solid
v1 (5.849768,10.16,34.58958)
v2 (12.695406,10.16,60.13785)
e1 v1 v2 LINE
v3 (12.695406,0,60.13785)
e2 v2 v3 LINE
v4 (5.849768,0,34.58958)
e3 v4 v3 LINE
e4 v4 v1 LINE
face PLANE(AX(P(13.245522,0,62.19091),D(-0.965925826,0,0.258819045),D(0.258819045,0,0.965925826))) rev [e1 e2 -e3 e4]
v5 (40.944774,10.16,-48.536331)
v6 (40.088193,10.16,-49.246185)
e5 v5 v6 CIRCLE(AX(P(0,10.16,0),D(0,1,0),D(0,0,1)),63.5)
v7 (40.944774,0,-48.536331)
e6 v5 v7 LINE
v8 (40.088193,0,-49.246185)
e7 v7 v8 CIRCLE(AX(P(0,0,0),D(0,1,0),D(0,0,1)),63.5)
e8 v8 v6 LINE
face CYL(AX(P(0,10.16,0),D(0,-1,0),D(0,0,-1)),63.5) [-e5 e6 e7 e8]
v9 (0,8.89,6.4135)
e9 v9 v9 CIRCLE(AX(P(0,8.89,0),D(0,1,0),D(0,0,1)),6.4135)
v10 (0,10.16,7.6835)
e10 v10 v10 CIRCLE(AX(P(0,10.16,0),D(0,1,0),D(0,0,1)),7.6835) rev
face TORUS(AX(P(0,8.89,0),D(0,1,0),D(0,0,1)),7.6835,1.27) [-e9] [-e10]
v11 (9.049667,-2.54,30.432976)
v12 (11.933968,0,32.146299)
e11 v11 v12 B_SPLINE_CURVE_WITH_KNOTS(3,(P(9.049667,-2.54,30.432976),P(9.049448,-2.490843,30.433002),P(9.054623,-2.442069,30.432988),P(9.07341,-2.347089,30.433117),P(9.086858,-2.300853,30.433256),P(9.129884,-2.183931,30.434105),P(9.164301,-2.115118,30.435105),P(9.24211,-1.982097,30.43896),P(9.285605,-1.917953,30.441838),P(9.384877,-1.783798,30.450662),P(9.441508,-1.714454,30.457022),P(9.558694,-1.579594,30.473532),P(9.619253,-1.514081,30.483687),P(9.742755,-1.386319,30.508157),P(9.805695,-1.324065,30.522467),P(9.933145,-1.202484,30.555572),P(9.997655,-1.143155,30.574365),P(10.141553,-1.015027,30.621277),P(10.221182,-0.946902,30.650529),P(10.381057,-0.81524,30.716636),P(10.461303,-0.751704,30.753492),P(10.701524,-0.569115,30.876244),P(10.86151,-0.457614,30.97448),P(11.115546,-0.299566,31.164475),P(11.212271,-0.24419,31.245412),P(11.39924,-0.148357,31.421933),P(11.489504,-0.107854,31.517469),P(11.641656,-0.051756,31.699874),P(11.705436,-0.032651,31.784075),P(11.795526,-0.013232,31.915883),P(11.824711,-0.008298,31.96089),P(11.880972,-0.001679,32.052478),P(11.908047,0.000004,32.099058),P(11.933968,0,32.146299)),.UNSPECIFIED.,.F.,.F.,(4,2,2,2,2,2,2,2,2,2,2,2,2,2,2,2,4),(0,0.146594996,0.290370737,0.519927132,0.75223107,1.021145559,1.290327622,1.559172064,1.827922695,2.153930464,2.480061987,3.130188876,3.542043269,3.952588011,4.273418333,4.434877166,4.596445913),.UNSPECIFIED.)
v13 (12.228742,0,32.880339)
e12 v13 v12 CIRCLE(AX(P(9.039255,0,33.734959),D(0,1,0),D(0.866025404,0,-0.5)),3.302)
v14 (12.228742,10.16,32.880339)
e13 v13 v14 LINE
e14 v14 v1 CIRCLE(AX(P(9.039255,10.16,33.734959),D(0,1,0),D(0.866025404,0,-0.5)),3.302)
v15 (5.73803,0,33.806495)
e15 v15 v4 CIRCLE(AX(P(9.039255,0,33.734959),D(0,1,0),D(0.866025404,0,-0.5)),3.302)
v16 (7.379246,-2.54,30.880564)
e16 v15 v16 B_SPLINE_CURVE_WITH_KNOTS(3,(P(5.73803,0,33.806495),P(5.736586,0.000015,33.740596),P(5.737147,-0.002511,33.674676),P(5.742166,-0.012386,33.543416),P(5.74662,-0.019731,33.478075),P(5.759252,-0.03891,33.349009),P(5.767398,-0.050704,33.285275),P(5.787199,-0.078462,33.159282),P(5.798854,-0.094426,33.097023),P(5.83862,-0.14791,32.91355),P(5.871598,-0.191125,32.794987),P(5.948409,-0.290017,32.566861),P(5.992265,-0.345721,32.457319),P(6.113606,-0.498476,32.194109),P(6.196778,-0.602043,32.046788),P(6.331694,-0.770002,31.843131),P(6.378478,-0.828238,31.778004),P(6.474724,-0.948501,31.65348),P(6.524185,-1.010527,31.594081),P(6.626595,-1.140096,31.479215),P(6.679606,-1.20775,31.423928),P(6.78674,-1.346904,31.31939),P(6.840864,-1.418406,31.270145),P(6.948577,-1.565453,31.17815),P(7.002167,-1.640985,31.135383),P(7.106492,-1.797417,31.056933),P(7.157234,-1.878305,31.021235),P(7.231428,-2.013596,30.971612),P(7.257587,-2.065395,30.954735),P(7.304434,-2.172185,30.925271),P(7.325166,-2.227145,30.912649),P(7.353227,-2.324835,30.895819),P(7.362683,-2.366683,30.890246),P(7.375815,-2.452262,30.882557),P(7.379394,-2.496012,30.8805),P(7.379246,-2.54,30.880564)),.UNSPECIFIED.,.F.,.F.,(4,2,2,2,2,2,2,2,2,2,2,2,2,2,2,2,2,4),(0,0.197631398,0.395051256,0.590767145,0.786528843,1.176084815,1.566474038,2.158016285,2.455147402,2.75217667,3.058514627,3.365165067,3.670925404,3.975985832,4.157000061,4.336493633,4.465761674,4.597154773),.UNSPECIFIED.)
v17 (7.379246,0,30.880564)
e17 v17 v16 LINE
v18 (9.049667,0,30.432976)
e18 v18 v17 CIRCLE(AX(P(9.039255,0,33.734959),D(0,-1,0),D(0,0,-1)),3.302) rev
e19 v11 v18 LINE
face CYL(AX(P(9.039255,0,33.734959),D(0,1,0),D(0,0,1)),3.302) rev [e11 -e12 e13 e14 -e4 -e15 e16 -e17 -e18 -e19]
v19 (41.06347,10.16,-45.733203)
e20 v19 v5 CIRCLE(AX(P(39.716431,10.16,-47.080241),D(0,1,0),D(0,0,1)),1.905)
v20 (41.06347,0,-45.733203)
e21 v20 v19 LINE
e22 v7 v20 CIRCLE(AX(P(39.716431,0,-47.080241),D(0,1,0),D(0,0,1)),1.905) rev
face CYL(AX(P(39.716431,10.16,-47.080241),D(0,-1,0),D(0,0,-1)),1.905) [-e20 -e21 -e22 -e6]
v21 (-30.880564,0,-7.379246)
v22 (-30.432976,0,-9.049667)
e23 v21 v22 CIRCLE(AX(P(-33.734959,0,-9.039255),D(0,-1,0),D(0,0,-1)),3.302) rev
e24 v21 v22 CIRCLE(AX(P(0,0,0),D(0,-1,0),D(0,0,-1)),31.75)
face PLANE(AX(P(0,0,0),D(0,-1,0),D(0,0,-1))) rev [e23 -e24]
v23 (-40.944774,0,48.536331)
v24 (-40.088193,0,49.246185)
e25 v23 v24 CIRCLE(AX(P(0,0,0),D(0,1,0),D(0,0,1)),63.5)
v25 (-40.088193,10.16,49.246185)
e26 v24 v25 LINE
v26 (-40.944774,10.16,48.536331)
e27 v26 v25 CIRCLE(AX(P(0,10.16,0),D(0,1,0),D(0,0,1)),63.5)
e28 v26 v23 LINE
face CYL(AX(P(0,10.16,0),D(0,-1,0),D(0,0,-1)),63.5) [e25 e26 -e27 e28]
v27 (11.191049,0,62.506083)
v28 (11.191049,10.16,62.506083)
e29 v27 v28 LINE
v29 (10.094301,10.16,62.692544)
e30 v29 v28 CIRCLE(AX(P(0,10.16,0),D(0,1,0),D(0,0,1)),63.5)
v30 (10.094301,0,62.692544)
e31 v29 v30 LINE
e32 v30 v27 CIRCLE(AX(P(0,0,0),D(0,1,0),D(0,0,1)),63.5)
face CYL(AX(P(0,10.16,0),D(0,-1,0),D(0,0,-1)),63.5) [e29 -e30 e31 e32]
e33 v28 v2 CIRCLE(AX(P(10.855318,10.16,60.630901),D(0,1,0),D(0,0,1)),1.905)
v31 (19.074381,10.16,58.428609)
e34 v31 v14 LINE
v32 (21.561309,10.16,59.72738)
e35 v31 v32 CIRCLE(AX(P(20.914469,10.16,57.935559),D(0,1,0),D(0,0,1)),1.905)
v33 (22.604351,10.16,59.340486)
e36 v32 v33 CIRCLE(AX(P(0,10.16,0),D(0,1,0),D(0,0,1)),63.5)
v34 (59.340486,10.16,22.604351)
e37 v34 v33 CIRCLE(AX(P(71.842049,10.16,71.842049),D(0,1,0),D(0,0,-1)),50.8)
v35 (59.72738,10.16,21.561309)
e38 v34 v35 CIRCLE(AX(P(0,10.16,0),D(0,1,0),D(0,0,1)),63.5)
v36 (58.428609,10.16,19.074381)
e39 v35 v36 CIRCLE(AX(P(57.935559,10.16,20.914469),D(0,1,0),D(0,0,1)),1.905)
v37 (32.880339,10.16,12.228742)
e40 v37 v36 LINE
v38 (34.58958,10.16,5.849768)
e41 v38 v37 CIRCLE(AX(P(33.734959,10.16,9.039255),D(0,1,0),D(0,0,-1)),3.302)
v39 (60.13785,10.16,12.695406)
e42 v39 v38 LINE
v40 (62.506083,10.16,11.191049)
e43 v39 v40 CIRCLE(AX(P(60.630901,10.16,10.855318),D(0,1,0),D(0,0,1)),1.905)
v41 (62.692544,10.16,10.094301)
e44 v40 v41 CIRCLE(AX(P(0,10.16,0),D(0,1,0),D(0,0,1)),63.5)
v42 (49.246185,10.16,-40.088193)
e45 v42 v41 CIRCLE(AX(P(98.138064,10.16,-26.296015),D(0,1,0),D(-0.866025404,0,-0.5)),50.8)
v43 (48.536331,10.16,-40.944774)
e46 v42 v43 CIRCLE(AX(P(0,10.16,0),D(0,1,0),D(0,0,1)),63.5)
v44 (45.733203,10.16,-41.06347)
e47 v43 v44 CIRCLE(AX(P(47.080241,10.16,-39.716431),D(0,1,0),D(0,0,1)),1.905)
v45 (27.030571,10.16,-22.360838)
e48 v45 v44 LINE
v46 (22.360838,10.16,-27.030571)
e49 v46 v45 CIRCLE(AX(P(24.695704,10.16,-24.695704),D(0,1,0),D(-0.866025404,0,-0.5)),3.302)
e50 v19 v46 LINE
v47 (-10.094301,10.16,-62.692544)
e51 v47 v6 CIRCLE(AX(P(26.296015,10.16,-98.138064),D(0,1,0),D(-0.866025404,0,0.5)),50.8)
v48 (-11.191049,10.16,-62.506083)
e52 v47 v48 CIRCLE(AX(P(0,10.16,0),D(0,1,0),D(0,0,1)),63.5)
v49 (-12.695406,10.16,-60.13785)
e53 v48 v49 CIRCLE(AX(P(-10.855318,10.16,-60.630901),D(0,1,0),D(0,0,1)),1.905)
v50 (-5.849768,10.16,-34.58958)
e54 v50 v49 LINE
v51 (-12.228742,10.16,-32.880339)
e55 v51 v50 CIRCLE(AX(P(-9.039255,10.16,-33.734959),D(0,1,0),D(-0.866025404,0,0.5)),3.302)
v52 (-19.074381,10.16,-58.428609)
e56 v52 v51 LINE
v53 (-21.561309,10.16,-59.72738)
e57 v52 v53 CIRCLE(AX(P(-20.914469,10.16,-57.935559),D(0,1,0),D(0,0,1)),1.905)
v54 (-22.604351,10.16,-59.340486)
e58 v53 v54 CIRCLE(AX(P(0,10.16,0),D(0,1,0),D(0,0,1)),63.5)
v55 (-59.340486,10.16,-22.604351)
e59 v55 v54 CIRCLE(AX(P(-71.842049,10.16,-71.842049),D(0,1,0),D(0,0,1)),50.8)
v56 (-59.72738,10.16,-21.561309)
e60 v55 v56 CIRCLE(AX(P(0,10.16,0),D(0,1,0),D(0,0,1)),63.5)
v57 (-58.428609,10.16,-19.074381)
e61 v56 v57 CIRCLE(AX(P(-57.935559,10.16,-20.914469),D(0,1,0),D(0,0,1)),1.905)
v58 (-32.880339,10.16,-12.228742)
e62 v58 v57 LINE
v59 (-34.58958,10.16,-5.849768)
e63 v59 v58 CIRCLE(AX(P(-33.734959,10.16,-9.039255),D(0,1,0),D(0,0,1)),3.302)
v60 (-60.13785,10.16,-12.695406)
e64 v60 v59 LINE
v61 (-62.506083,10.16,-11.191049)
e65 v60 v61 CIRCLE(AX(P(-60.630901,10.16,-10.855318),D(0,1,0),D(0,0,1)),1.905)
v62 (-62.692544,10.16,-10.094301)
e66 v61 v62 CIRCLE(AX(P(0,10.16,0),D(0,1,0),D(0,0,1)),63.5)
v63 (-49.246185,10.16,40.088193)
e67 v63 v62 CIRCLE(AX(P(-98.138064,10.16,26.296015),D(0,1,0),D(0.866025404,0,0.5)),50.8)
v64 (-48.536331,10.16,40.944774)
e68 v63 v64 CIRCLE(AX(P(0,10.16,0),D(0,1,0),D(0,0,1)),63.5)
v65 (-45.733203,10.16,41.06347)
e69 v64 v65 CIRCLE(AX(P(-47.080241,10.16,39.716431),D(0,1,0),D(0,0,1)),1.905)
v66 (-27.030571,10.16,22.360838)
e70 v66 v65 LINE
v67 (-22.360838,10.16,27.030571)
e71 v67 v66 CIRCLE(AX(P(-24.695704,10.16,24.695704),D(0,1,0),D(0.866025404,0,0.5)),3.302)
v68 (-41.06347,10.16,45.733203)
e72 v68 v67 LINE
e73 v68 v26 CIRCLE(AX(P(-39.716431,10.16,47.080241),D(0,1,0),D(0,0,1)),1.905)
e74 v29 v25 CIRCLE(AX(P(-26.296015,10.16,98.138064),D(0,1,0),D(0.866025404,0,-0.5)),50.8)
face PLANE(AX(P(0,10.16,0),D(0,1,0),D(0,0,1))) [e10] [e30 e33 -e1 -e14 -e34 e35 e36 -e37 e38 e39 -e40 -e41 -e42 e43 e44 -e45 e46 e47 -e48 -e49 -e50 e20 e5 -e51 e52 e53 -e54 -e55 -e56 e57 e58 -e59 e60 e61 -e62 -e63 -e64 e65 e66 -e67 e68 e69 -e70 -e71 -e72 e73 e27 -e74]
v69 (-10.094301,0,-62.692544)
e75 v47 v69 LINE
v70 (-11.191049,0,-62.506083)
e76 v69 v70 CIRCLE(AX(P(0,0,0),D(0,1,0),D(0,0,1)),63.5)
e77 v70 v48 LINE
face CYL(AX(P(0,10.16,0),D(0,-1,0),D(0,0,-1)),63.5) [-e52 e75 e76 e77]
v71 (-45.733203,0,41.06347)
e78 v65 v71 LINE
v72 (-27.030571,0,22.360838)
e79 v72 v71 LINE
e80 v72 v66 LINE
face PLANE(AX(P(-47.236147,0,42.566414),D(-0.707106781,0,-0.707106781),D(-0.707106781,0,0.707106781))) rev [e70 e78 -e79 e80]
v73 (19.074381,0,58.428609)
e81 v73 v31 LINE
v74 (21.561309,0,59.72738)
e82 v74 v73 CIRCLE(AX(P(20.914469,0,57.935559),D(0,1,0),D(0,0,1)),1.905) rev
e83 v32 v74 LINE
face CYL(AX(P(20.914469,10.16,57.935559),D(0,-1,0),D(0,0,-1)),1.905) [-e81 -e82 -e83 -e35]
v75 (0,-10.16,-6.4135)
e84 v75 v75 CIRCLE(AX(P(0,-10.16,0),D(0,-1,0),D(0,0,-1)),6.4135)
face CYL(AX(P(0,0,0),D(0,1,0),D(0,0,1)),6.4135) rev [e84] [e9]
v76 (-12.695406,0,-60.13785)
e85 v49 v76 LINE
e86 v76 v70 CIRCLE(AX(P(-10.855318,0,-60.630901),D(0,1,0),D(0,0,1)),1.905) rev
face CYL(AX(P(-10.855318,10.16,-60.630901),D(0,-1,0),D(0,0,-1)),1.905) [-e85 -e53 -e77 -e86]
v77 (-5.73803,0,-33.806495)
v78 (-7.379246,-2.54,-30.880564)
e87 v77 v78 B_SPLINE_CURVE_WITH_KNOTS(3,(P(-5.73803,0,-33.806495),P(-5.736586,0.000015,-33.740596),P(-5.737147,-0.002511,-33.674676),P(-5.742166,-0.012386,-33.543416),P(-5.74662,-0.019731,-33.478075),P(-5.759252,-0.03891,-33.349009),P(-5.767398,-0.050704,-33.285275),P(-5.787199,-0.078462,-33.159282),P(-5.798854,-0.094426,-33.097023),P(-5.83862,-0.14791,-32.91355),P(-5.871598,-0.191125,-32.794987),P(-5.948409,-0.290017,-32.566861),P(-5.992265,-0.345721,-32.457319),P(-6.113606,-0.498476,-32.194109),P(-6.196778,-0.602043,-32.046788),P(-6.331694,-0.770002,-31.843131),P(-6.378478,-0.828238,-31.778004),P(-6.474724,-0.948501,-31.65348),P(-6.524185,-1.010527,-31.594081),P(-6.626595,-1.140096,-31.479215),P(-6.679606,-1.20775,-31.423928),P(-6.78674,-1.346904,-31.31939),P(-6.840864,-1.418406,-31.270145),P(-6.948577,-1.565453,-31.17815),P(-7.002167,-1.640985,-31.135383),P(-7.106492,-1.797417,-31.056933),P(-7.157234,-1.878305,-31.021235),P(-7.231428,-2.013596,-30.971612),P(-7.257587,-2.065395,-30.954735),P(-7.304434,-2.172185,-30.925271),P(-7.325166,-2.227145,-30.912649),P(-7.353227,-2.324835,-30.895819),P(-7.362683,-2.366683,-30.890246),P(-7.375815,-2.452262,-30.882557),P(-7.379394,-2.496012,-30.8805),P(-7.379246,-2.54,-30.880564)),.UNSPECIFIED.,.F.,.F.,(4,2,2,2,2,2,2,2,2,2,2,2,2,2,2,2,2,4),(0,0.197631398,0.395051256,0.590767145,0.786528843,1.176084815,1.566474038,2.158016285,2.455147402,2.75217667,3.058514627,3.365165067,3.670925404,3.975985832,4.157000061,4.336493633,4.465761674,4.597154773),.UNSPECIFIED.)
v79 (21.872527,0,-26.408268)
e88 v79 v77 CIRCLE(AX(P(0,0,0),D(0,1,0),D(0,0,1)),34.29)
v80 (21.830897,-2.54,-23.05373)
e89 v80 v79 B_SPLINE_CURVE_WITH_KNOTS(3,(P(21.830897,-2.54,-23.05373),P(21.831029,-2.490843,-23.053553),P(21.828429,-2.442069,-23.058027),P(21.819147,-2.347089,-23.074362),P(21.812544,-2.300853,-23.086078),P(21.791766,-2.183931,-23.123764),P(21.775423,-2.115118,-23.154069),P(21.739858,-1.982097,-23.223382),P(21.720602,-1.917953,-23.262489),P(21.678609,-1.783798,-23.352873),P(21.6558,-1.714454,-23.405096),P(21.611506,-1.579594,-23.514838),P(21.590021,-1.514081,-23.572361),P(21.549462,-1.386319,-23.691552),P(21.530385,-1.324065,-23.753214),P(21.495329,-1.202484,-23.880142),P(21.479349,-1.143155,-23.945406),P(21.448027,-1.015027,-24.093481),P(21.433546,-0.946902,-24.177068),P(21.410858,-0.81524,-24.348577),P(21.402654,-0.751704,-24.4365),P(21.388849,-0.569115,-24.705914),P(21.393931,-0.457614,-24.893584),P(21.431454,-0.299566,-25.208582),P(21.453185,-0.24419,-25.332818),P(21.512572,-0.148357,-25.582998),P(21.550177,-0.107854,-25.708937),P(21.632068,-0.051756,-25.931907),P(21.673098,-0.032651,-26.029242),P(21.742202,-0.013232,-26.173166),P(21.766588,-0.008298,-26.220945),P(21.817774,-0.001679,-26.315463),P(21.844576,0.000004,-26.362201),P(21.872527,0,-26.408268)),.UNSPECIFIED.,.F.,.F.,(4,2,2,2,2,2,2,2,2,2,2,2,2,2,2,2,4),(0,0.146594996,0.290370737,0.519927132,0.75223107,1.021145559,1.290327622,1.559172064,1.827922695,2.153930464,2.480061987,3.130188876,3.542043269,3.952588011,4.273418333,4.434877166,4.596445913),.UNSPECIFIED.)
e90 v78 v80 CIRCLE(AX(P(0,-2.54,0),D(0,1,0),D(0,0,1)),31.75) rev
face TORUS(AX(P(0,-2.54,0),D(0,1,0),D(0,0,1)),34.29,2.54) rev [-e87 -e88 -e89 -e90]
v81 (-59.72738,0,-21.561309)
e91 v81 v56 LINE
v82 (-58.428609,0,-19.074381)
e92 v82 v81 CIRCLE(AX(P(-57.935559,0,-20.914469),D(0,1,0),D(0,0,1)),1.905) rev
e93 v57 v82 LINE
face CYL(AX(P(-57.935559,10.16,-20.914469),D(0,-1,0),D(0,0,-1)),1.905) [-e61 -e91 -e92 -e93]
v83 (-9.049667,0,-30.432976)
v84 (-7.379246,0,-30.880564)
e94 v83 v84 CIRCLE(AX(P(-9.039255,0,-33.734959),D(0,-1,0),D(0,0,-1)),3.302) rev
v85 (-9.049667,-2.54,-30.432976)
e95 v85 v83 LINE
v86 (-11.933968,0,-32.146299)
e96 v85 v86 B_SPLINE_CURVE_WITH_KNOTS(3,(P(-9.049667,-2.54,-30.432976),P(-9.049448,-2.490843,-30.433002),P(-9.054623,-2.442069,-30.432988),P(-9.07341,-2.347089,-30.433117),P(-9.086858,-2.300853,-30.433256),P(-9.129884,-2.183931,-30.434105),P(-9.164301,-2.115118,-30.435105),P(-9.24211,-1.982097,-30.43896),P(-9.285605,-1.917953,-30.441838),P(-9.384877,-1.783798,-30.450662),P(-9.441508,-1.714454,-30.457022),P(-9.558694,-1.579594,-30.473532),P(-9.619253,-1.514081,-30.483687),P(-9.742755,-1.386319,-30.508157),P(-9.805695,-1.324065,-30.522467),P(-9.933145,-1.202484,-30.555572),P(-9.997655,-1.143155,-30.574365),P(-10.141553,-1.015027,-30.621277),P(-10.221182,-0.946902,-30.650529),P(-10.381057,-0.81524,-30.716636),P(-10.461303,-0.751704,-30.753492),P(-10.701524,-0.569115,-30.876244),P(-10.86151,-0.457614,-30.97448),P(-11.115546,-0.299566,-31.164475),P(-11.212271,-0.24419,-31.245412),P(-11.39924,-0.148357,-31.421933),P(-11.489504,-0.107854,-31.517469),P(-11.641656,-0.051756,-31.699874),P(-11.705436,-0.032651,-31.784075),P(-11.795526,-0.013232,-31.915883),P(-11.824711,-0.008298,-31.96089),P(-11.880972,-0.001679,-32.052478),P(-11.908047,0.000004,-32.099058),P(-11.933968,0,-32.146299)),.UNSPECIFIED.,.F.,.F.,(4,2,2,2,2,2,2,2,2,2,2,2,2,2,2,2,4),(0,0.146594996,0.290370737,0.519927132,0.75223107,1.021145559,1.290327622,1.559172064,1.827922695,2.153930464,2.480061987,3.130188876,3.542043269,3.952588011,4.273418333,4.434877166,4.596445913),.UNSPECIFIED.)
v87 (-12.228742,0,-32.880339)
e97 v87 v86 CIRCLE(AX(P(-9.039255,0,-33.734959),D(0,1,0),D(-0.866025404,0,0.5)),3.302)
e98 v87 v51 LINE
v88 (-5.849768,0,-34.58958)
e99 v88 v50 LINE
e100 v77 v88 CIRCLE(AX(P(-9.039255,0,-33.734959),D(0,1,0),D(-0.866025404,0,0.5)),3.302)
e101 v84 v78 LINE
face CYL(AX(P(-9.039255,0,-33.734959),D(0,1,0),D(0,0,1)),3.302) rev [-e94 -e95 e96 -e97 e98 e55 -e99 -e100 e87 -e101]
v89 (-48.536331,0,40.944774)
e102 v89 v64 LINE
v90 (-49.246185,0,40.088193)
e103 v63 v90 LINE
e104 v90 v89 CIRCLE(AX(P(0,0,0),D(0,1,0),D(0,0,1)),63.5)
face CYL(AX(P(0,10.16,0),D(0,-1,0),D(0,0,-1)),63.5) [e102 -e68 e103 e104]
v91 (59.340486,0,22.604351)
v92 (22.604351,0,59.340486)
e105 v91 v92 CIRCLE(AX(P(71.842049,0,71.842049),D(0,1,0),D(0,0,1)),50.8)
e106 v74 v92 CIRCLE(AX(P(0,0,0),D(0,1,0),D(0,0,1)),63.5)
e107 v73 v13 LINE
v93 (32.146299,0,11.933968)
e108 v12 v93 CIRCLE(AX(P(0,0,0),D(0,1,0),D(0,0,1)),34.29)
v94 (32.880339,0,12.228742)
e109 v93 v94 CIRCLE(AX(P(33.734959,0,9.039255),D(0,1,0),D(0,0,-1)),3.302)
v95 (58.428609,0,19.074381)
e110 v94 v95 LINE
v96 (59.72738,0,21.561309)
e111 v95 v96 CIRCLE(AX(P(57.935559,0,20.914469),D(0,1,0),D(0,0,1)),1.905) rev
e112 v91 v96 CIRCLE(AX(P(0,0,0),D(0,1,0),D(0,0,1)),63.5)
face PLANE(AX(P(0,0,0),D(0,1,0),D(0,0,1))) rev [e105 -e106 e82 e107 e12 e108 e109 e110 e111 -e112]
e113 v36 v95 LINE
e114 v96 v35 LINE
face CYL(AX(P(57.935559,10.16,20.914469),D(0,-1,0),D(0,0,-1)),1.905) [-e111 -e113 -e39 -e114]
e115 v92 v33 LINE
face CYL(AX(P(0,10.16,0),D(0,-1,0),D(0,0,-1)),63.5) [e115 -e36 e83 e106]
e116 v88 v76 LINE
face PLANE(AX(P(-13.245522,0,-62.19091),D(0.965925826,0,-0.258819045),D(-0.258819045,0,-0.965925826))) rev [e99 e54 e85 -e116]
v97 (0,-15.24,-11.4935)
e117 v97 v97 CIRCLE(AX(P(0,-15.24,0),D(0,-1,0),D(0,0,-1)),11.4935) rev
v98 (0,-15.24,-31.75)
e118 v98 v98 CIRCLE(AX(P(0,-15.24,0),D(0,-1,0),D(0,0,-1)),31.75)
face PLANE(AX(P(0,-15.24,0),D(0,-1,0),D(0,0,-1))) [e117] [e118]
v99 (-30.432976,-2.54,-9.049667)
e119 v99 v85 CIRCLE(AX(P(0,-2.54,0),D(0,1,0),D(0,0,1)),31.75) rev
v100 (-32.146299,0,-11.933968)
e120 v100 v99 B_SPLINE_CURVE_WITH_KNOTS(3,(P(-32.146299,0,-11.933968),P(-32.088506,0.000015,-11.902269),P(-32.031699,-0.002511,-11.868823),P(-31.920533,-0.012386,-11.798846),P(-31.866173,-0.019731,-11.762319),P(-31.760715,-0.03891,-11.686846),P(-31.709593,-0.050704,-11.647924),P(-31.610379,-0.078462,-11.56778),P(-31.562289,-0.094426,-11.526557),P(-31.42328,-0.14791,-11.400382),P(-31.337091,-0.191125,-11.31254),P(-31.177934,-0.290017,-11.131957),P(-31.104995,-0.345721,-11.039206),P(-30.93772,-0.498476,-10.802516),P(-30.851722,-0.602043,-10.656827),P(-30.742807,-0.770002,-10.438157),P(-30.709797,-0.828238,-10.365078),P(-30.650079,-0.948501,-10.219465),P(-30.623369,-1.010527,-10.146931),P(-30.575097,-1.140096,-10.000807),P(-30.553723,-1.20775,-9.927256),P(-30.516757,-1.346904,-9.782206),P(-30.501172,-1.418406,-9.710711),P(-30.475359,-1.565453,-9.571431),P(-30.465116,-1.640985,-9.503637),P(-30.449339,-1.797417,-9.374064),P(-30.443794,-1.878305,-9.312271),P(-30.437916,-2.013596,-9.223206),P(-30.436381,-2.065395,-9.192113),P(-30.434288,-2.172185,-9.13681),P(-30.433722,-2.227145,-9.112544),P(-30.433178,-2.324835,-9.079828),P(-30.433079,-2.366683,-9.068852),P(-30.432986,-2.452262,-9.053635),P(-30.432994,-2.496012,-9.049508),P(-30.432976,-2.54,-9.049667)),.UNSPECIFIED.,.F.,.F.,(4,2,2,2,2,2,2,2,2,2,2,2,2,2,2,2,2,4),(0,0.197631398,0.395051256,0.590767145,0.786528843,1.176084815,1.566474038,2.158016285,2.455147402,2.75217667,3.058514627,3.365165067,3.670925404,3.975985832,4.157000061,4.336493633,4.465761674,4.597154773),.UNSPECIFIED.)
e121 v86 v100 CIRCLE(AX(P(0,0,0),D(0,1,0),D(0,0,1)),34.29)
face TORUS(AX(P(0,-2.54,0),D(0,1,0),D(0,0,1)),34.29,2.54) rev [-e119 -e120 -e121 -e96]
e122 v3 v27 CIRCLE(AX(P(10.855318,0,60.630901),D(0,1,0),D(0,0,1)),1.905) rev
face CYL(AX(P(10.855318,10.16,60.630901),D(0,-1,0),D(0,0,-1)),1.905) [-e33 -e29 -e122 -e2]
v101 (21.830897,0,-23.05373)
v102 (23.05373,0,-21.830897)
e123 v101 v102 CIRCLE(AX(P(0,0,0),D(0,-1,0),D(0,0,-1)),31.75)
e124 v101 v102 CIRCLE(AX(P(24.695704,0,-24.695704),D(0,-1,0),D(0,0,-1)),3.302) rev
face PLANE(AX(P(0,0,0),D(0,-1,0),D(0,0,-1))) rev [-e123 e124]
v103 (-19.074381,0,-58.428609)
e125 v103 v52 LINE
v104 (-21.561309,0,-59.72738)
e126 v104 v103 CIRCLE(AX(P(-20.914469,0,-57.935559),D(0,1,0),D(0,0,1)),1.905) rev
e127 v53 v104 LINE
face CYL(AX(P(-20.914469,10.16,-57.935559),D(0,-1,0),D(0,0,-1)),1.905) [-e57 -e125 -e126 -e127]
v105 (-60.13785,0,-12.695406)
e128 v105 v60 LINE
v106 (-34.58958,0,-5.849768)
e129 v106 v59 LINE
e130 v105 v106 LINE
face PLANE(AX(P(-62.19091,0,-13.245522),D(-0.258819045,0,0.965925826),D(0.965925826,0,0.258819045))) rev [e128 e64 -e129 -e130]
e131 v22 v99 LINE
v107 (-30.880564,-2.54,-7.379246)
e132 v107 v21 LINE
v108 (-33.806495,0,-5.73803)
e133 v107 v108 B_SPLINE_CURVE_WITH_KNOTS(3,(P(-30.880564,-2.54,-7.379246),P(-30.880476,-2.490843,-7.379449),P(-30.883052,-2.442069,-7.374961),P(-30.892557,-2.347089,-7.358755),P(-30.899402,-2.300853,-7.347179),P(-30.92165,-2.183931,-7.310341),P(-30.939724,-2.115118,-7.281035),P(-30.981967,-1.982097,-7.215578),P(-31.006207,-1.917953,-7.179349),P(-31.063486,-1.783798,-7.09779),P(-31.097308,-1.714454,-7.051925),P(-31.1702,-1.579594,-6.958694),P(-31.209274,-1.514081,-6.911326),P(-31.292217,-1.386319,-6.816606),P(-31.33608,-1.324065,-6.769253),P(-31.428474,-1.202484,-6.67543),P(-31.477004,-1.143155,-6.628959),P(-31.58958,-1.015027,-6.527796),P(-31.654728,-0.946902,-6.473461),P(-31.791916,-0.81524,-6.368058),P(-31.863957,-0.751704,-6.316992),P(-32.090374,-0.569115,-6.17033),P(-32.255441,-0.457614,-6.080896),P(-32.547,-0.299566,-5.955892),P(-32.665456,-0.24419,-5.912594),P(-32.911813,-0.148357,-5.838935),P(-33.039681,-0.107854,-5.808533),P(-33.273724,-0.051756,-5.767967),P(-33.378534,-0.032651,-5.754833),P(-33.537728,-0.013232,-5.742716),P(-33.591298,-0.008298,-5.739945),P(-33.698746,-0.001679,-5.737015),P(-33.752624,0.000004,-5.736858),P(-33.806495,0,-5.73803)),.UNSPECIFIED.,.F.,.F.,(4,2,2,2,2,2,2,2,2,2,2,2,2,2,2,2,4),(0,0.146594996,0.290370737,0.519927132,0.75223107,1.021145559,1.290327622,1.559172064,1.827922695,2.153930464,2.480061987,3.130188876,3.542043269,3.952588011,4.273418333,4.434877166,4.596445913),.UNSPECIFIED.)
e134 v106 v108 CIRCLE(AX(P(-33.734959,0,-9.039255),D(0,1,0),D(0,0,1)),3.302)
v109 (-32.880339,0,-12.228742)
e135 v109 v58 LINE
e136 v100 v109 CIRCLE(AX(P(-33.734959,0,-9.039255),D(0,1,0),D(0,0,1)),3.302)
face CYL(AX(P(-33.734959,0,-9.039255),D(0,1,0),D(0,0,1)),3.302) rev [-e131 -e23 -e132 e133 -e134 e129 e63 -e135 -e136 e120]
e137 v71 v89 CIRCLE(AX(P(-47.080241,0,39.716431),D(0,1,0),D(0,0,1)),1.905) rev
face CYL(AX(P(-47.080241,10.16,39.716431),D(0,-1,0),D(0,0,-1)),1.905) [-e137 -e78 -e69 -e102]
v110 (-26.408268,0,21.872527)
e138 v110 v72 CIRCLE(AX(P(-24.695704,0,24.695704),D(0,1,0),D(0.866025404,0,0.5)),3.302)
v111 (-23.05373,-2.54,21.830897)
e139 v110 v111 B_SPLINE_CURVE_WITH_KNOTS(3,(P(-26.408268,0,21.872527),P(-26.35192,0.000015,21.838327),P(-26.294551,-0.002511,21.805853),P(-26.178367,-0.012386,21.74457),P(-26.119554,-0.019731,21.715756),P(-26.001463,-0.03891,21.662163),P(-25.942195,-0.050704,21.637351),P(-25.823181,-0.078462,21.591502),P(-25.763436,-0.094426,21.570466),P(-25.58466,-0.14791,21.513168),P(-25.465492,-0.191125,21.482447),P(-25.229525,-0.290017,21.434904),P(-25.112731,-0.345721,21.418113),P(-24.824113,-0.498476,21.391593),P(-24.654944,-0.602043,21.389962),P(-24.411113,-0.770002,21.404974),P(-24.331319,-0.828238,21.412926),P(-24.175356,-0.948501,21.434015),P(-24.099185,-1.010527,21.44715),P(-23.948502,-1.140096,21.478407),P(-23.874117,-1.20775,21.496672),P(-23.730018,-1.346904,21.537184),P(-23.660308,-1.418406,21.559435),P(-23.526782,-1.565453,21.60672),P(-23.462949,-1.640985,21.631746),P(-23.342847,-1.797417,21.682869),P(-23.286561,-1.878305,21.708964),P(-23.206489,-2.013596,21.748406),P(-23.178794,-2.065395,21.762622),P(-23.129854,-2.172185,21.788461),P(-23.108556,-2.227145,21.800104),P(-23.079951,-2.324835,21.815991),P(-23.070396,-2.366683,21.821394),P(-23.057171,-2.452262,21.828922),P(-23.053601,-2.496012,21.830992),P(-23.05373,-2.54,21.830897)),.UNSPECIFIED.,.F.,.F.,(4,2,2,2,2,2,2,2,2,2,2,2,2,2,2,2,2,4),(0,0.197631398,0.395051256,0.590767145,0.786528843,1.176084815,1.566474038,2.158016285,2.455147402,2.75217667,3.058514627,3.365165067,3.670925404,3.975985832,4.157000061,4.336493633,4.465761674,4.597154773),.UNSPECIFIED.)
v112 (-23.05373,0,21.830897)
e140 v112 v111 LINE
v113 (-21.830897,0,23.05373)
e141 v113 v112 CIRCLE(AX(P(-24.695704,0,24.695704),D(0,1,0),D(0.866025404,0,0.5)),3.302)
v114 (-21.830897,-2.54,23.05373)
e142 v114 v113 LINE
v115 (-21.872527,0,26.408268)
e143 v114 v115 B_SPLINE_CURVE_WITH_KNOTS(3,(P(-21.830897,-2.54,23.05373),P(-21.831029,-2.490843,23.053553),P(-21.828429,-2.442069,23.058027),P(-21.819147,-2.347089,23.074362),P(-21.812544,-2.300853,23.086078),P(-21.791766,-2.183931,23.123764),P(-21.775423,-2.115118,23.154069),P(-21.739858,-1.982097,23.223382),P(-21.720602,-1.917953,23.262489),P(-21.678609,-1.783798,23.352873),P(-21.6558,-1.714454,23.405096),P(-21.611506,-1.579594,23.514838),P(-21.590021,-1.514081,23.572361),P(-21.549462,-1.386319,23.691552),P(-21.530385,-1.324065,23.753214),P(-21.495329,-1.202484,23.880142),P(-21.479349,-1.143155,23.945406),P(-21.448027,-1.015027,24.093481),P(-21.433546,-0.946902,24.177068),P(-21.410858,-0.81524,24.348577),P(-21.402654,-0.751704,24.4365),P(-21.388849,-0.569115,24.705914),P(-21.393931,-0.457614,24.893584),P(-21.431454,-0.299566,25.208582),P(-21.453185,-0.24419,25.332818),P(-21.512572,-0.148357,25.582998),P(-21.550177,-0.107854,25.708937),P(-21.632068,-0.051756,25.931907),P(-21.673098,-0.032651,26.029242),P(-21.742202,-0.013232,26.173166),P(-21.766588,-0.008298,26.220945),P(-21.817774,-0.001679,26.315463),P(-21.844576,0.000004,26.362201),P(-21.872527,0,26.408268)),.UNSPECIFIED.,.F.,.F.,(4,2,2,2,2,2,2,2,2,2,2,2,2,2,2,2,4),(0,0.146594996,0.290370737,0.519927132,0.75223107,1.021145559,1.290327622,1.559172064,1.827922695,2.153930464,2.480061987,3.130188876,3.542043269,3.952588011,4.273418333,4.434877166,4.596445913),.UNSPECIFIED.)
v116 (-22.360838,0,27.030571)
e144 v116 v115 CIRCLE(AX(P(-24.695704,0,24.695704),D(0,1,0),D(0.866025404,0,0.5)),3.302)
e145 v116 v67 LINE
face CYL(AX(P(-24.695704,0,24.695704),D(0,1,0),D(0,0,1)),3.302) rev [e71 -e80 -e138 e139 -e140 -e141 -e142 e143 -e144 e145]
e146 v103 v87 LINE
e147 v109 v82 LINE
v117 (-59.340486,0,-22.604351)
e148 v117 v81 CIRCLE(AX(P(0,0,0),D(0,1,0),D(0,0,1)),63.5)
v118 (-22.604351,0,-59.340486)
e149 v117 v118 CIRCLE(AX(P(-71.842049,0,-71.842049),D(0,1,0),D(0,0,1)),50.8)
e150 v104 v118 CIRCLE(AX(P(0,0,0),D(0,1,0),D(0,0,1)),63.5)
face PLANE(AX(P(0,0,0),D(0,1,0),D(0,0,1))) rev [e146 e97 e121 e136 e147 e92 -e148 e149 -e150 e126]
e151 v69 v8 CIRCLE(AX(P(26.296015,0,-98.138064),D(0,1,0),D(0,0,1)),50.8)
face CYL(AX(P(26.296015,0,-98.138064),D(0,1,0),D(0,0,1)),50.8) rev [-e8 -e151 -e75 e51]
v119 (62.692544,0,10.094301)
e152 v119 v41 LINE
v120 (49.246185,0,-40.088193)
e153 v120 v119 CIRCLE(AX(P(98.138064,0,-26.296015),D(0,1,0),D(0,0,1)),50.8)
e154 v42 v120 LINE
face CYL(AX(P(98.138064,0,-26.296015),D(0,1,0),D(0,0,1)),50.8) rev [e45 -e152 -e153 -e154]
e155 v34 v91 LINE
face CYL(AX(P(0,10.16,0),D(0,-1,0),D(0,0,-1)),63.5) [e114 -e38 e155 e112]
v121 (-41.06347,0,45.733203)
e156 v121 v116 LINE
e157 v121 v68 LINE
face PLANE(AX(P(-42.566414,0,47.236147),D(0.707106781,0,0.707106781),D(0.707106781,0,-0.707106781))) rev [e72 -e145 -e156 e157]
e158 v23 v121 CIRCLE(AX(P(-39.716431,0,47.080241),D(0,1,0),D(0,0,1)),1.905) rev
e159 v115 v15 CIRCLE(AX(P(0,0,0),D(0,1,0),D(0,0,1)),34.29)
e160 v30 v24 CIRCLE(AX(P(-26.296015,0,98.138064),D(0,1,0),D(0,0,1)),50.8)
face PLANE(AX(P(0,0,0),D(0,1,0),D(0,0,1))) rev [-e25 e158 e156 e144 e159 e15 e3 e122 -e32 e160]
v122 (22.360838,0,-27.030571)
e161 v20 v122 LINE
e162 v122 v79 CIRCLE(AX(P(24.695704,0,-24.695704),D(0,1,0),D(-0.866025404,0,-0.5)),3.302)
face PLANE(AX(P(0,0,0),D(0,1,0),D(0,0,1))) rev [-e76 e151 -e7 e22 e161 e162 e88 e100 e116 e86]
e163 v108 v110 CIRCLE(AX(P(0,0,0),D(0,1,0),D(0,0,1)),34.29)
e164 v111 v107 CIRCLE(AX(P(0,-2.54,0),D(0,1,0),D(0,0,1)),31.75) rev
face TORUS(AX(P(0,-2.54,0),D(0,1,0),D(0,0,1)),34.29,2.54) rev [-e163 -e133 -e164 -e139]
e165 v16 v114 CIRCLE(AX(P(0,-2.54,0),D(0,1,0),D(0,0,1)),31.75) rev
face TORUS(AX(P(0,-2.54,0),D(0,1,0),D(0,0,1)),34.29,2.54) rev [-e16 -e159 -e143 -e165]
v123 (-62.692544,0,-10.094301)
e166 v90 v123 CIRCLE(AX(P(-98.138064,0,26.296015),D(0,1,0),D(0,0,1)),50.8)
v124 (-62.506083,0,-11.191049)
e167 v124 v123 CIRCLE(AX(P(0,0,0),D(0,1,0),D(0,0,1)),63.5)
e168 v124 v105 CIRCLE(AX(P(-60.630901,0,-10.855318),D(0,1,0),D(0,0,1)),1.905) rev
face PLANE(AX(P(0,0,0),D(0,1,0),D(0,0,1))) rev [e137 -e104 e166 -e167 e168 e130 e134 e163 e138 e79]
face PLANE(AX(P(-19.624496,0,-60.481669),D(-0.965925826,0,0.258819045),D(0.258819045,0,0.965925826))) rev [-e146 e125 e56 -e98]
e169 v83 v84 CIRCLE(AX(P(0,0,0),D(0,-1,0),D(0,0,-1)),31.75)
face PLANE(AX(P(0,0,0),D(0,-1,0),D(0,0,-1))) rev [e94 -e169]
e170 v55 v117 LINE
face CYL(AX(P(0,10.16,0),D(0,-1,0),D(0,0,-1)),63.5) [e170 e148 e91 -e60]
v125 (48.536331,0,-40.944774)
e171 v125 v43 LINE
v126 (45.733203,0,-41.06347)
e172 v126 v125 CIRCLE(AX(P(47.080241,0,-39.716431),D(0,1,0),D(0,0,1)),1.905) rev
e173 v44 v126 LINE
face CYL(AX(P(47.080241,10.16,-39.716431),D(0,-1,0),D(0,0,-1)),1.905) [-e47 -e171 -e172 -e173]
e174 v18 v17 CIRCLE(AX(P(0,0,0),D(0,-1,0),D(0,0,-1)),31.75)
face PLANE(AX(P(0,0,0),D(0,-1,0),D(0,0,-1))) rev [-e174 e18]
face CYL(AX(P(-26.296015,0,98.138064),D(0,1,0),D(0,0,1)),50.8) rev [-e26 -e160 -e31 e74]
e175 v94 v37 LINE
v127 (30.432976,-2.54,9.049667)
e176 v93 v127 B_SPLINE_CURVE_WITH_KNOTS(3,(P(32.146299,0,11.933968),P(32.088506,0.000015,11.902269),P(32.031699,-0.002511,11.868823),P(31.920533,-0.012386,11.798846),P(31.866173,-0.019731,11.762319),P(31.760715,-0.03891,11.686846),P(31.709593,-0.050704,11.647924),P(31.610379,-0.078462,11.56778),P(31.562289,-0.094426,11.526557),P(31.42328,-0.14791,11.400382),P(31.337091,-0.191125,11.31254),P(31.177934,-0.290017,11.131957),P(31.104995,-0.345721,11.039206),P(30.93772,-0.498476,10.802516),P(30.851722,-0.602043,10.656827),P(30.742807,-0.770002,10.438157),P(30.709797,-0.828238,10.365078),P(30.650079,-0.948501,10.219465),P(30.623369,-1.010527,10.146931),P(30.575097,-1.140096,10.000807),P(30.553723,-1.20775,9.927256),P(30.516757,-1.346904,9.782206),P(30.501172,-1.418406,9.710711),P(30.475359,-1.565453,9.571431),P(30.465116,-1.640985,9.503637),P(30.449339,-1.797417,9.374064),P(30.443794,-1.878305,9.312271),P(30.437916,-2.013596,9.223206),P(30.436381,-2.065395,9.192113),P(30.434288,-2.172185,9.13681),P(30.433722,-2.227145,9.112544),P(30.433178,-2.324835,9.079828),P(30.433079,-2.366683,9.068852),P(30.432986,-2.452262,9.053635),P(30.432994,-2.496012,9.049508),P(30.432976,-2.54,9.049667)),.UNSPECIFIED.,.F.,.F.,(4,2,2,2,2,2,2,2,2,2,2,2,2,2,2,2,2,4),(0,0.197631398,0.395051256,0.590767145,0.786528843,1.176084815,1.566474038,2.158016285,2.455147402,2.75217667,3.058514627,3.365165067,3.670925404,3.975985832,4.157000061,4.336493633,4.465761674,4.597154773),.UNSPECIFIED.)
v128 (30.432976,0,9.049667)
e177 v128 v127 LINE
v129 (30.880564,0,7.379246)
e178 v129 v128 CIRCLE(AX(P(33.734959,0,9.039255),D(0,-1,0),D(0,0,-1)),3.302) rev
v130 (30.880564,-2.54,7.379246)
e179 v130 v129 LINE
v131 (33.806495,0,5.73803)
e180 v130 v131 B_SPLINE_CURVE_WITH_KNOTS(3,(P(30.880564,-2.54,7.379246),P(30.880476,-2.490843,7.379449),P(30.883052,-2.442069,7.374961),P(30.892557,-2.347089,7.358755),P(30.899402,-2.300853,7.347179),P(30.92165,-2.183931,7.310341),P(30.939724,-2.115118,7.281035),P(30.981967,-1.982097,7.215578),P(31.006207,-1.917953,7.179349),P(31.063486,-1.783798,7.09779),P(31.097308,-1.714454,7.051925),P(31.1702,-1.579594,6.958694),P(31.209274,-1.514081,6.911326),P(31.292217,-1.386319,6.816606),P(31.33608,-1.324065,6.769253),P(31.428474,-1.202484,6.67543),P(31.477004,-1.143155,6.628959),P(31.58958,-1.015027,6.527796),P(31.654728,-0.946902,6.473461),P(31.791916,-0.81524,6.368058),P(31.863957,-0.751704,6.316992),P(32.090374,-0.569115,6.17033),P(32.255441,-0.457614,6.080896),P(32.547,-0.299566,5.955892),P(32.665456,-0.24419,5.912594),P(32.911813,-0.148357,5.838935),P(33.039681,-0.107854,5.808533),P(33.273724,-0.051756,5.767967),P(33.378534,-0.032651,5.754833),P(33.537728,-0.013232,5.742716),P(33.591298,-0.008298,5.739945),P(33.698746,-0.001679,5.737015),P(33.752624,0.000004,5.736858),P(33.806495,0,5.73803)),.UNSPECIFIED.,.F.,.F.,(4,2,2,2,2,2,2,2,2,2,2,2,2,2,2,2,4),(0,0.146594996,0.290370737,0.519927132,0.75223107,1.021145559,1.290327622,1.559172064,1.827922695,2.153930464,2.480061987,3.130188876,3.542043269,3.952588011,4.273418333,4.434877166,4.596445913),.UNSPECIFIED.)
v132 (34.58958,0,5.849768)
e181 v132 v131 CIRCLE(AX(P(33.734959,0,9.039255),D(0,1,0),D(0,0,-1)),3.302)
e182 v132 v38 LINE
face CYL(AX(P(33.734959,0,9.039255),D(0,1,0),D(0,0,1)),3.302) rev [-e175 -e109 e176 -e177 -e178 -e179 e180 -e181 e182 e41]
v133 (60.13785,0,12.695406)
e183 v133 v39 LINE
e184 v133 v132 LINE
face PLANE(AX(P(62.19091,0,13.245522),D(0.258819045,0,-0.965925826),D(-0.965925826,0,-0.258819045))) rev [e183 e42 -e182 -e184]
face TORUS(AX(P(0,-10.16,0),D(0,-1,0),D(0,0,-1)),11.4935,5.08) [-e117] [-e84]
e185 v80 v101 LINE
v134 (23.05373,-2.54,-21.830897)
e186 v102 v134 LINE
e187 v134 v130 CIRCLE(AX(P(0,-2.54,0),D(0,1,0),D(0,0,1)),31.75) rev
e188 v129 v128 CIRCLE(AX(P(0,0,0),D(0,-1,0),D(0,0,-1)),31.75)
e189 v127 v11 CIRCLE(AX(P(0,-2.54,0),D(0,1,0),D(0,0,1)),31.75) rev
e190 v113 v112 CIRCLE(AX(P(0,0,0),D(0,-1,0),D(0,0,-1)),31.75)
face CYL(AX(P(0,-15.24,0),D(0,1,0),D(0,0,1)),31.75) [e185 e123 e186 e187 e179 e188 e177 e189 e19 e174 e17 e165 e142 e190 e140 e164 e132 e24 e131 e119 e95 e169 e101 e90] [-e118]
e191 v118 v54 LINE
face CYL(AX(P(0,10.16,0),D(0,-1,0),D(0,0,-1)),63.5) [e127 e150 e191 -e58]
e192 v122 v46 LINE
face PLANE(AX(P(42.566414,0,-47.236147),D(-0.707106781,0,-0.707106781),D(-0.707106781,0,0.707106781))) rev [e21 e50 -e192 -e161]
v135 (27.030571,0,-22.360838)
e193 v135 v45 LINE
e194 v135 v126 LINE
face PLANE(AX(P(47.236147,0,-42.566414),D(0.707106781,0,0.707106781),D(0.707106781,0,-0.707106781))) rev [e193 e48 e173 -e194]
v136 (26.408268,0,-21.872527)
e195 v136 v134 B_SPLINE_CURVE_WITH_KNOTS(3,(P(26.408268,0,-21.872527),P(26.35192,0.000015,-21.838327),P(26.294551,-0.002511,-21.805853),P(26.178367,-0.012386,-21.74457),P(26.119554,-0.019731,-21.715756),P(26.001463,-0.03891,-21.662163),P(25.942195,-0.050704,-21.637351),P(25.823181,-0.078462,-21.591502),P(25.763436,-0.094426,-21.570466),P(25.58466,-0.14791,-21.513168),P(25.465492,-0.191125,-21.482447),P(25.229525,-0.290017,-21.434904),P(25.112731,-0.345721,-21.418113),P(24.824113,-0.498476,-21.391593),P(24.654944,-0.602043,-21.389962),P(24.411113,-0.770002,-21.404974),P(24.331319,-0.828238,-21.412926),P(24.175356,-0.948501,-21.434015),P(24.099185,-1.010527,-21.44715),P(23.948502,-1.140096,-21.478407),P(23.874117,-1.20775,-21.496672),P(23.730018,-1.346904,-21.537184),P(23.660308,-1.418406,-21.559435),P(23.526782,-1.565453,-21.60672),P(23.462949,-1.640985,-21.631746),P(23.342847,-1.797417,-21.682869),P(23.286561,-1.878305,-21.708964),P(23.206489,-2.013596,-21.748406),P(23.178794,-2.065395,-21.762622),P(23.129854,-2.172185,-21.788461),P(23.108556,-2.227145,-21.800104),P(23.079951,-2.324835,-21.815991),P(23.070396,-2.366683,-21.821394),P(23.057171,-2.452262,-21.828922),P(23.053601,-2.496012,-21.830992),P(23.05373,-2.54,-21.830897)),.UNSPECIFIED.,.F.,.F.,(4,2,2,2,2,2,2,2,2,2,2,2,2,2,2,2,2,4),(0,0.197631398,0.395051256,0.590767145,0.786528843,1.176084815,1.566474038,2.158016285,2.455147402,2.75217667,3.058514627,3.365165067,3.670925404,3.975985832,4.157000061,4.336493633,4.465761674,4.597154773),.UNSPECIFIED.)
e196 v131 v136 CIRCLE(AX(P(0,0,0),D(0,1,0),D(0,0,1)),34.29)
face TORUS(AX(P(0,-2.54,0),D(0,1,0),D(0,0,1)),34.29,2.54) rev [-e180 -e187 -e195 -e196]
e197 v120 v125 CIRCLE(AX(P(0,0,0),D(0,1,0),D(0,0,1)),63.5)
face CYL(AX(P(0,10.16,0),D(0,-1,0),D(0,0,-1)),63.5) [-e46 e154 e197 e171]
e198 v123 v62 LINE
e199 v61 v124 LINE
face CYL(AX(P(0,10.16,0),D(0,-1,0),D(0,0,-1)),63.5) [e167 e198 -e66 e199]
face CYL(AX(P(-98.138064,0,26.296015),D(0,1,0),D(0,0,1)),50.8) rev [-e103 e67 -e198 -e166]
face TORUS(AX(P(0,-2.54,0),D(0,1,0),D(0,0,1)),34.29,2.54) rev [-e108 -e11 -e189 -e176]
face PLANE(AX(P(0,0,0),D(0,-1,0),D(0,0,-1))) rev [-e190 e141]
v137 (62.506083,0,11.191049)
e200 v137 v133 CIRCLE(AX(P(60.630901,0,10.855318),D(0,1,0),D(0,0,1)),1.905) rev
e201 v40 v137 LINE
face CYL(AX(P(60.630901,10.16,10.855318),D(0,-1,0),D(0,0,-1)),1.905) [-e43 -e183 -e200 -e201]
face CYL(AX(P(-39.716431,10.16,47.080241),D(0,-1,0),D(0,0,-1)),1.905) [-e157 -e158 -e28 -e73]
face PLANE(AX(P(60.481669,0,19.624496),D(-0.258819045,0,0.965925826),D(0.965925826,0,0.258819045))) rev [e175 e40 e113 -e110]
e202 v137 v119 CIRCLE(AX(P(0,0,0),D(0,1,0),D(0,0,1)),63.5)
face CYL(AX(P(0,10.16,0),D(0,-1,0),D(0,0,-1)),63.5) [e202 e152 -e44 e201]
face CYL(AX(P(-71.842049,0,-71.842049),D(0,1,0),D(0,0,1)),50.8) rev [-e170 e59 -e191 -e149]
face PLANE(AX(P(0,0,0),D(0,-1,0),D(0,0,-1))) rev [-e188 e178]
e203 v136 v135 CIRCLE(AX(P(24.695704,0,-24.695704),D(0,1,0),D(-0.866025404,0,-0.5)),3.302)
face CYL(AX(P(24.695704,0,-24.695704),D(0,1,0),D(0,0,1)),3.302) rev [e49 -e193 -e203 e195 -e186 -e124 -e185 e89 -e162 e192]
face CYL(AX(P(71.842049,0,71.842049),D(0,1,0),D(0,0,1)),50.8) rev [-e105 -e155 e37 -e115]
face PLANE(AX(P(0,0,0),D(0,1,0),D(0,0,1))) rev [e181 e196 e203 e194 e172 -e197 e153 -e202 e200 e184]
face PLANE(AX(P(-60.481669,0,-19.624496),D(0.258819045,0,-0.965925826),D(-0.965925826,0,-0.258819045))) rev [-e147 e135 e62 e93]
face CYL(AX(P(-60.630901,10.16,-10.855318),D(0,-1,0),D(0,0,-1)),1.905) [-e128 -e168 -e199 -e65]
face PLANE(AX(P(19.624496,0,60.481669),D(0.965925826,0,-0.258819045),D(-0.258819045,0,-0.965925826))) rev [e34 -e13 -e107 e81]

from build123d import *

# Parameters (mm, degrees)
SKETCH1_R           = 63.5
BOSS_EXTRUDE1_DEPTH = 10.16
SKETCH2_R           = 50.8
CUT_EXTRUDE1_DEPTH  = 91.375470123
CIRPATTERN1_COUNT   = 6
CUT_EXTRUDE2_DEPTH  = 90.240886157
SKETCH4_R           = 6.4135
CUT_EXTRUDE3_DEPTH  = 90.240886157
CIRPATTERN2_COUNT   = 6
FILLET1_R           = 1.905
SKETCH5_R           = 31.75
BOSS_EXTRUDE2_DEPTH = 15.24
SKETCH6_R           = 6.4135
CUT_EXTRUDE4_DEPTH  = 90.960923529
FILLET2_R           = 2.54
FILLET3_R           = 5.08
FILLET4_R           = 1.27


with BuildPart() as part:
    # Sketch1 → Boss-Extrude1 (new body)
    with BuildSketch(Plane(origin=(0, 0, 0), x_dir=(1, 0, 0), z_dir=(0, 1, 0))):
        with Locations(Location((0, 0, 0), (0, 0, 270))):
            Circle(SKETCH1_R)
    extrude(amount=BOSS_EXTRUDE1_DEPTH)

    # Sketch2 → Cut-Extrude1 (cut, through all)
    with BuildSketch(Plane(origin=(0, 10.16, 0), x_dir=(1, 0, 0), z_dir=(0, 1, 0))):
        with Locations((-71.842048969, 71.842048969)):
            Circle(SKETCH2_R)
    cut_extrude1 = extrude(amount=-CUT_EXTRUDE1_DEPTH, mode=Mode.SUBTRACT)

    # CirPattern1: Cut-Extrude1 ×6 about axis
    cirpattern1_axis = Axis((0, 0, 0), (0, 1, 0))
    for i in range(1, CIRPATTERN1_COUNT):
        add(cut_extrude1.rotate(cirpattern1_axis, i * 360 / CIRPATTERN1_COUNT), mode=Mode.SUBTRACT)

    # Sketch3 → Cut-Extrude2 (cut, through all)
    with BuildSketch(Plane(origin=(0, 10.16, 0), x_dir=(1, 0, 0), z_dir=(0, 1, 0))):
        with BuildLine():
            Line((-60.481669482, 19.624496442), (-32.880338996, 12.228742229))
            ThreePointArc((-32.880338996, 12.228742229), (-30.545472405, 8.184634663), (-34.58957997, 5.849768072))
            Line((-34.58957997, 5.849768072), (-62.190910456, 13.245522286))
            ThreePointArc((-62.190910456, 13.245522286), (-64.525777048, 17.289629851), (-60.481669482, 19.624496442))
        make_face()
    cut_extrude2 = extrude(amount=-CUT_EXTRUDE2_DEPTH, mode=Mode.SUBTRACT)

    # Sketch4 → Cut-Extrude3 (cut, through all)
    with BuildSketch(Plane(origin=(0, 10.16, 0), x_dir=(1, 0, 0), z_dir=(0, 1, 0))):
        with Locations(Location((0, 0, 0), (0, 0, 270))):
            Circle(SKETCH4_R)
    extrude(amount=-CUT_EXTRUDE3_DEPTH, mode=Mode.SUBTRACT)

    # CirPattern2: Cut-Extrude2 ×6 about axis
    cirpattern2_axis = Axis((0, 0, 0), (0, 1, 0))
    for i in range(1, CIRPATTERN2_COUNT):
        add(cut_extrude2.rotate(cirpattern2_axis, i * 360 / CIRPATTERN2_COUNT), mode=Mode.SUBTRACT)

    # Fillet1
    fillet1_edges = [part.edges().sort_by_distance(p)[0] for p in [
        (-47.175399572, 5.08, 42.505666389),
        (-42.505666389, 5.08, 47.175399572),
        (13.223287112, 5.08, 62.107927658),
        (19.602261269, 5.08, 60.398686684),
        (60.398686684, 5.08, 19.602261269),
        (62.107927658, 5.08, 13.223287112),
        (47.175399572, 5.08, -42.505666389),
        (42.505666389, 5.08, -47.175399572),
        (-13.223287112, 5.08, -62.107927658),
        (-19.602261269, 5.08, -60.398686684),
        (-60.398686684, 5.08, -19.602261269),
        (-62.107927658, 5.08, -13.223287112),
    ]]
    fillet(fillet1_edges, radius=FILLET1_R)

    # Sketch5 → Boss-Extrude2 (add)
    with BuildSketch(Plane(origin=(0, 0, 0), x_dir=(-1, 0, 0), z_dir=(0, -1, 0))):
        with Locations(Location((0, 0, 0), (0, 0, 256.560575533))):
            Circle(SKETCH5_R)
    extrude(amount=BOSS_EXTRUDE2_DEPTH)

    # Sketch6 → Cut-Extrude4 (cut, through all)
    with BuildSketch(Plane(origin=(0, 0, 0), x_dir=(1, 0, 0), z_dir=(0, 1, 0))):
        with Locations(Location((0, 0, 0), (0, 0, 270))):
            Circle(SKETCH6_R)
    extrude(amount=-CUT_EXTRUDE4_DEPTH, mode=Mode.SUBTRACT)

    # Fillet2
    # the kernel refuses this fillet: 2.54 mm, written as the material it adds along each edge
    with BuildSketch(Plane(origin=(0, 0, 0), x_dir=(0.5749992742751929, 0, -0.8181539186381751), z_dir=(-0.8181539186381751, 0, -0.5749992742751929))) as fillet2_piece_1_section:
        with BuildLine():
            CenterArc((31.75 + FILLET2_R, FILLET2_R), FILLET2_R, 180, 90)
            Line((31.75 + FILLET2_R, 0), (31.75, 0))
            Line((31.75, 0), (31.75, FILLET2_R))
        make_face()
    fillet2_piece_1 = revolve(axis=Axis((0, 0, 0), (0, -1, 0)), revolution_arc=79.800837255, mode=Mode.PRIVATE)
    fillet2_piece_1 = fillet2_piece_1 - Plane(origin=(33.734959483, -0.606371024, 9.03925515), x_dir=(-0.2588190451025229, 0, 0.9659258262890678), z_dir=(0, 1, 0)) * Cylinder(3.302, 138, mode=Mode.PRIVATE)
    fillet2_piece_1 = fillet2_piece_1 - Plane(origin=(24.695704333, -0.606371024, -24.695704333), x_dir=(0.7071067811865457, 0, 0.7071067811865495), z_dir=(0, 1, 0)) * Cylinder(3.302, 138, mode=Mode.PRIVATE)
    add(fillet2_piece_1)
    with BuildSketch(Plane(origin=(0, 0, 0), x_dir=(0.9960417148840375, 0, 0.08888701936090508), z_dir=(0.08888701936090508, 0, -0.9960417148840375))) as fillet2_piece_2_section:
        with BuildLine():
            CenterArc((31.75 + FILLET2_R, FILLET2_R), FILLET2_R, 180, 90)
            Line((31.75 + FILLET2_R, 0), (31.75, 0))
            Line((31.75, 0), (31.75, FILLET2_R))
        make_face()
    fillet2_piece_2 = revolve(axis=Axis((0, 0, 0), (0, -1, 0)), revolution_arc=79.800837255, mode=Mode.PRIVATE)
    fillet2_piece_2 = fillet2_piece_2 - Plane(origin=(9.03925515, -0.606371024, 33.734959483), x_dir=(-0.965925826289069, 0, 0.2588190451025186), z_dir=(0, 1, 0)) * Cylinder(3.302, 138, mode=Mode.PRIVATE)
    fillet2_piece_2 = fillet2_piece_2 - Plane(origin=(33.734959483, -0.606371024, 9.03925515), x_dir=(-0.2588190451025229, 0, 0.9659258262890678), z_dir=(0, 1, 0)) * Cylinder(3.302, 138, mode=Mode.PRIVATE)
    add(fillet2_piece_2)
    with BuildSketch(Plane(origin=(0, 0, 0), x_dir=(0.4210424406137115, 0, 0.9070409379967639), z_dir=(0.9070409379967639, 0, -0.4210424406137115))) as fillet2_piece_3_section:
        with BuildLine():
            CenterArc((31.75 + FILLET2_R, FILLET2_R), FILLET2_R, 180, 90)
            Line((31.75 + FILLET2_R, 0), (31.75, 0))
            Line((31.75, 0), (31.75, FILLET2_R))
        make_face()
    fillet2_piece_3 = revolve(axis=Axis((0, 0, 0), (0, -1, 0)), revolution_arc=79.800837255, mode=Mode.PRIVATE)
    fillet2_piece_3 = fillet2_piece_3 - Plane(origin=(9.03925515, -0.606371024, 33.734959483), x_dir=(-0.965925826289069, 0, 0.2588190451025186), z_dir=(0, 1, 0)) * Cylinder(3.302, 138, mode=Mode.PRIVATE)
    fillet2_piece_3 = fillet2_piece_3 - Plane(origin=(-24.695704333, -0.606371024, 24.695704333), x_dir=(-0.7071067811865459, 0, -0.7071067811865491), z_dir=(0, 1, 0)) * Cylinder(3.302, 138, mode=Mode.PRIVATE)
    add(fillet2_piece_3)
    with BuildSketch(Plane(origin=(0, 0, 0), x_dir=(-0.5749992742751904, 0, 0.8181539186381769), z_dir=(0.8181539186381769, 0, 0.5749992742751904))) as fillet2_piece_4_section:
        with BuildLine():
            CenterArc((31.75 + FILLET2_R, FILLET2_R), FILLET2_R, 180, 90)
            Line((31.75 + FILLET2_R, 0), (31.75, 0))
            Line((31.75, 0), (31.75, FILLET2_R))
        make_face()
    fillet2_piece_4 = revolve(axis=Axis((0, 0, 0), (0, -1, 0)), revolution_arc=79.800837255, mode=Mode.PRIVATE)
    fillet2_piece_4 = fillet2_piece_4 - Plane(origin=(-24.695704333, -0.606371024, 24.695704333), x_dir=(-0.7071067811865459, 0, -0.7071067811865491), z_dir=(0, 1, 0)) * Cylinder(3.302, 138, mode=Mode.PRIVATE)
    fillet2_piece_4 = fillet2_piece_4 - Plane(origin=(-33.734959483, -0.606371024, -9.03925515), x_dir=(0.2588190451025228, 0, -0.9659258262890678), z_dir=(0, 1, 0)) * Cylinder(3.302, 138, mode=Mode.PRIVATE)
    add(fillet2_piece_4)
    with BuildSketch(Plane(origin=(0, 0, 0), x_dir=(-0.9960417148840376, 0, -0.08888701936090405), z_dir=(-0.08888701936090405, 0, 0.9960417148840376))) as fillet2_piece_5_section:
        with BuildLine():
            CenterArc((31.75 + FILLET2_R, FILLET2_R), FILLET2_R, 180, 90)
            Line((31.75 + FILLET2_R, 0), (31.75, 0))
            Line((31.75, 0), (31.75, FILLET2_R))
        make_face()
    fillet2_piece_5 = revolve(axis=Axis((0, 0, 0), (0, -1, 0)), revolution_arc=79.800837255, mode=Mode.PRIVATE)
    fillet2_piece_5 = fillet2_piece_5 - Plane(origin=(-33.734959483, -0.606371024, -9.03925515), x_dir=(0.2588190451025228, 0, -0.9659258262890678), z_dir=(0, 1, 0)) * Cylinder(3.302, 138, mode=Mode.PRIVATE)
    fillet2_piece_5 = fillet2_piece_5 - Plane(origin=(-9.03925515, -0.606371024, -33.734959483), x_dir=(0.9659258262890689, 0, -0.25881904510251885), z_dir=(0, 1, 0)) * Cylinder(3.302, 138, mode=Mode.PRIVATE)
    add(fillet2_piece_5)
    with BuildSketch(Plane(origin=(0, 0, 0), x_dir=(-0.4210424406088149, 0, -0.907040937999037), z_dir=(-0.907040937999037, 0, 0.4210424406088149))) as fillet2_piece_6_section:
        with BuildLine():
            CenterArc((31.75 + FILLET2_R, FILLET2_R), FILLET2_R, 180, 90)
            Line((31.75 + FILLET2_R, 0), (31.75, 0))
            Line((31.75, 0), (31.75, FILLET2_R))
        make_face()
    fillet2_piece_6 = revolve(axis=Axis((0, 0, 0), (0, -1, 0)), revolution_arc=79.800837255, mode=Mode.PRIVATE)
    fillet2_piece_6 = fillet2_piece_6 - Plane(origin=(24.695704333, -0.606371024, -24.695704333), x_dir=(0.7071067811865457, 0, 0.7071067811865495), z_dir=(0, 1, 0)) * Cylinder(3.302, 138, mode=Mode.PRIVATE)
    fillet2_piece_6 = fillet2_piece_6 - Plane(origin=(-9.03925515, -0.606371024, -33.734959483), x_dir=(0.9659258262890689, 0, -0.25881904510251885), z_dir=(0, 1, 0)) * Cylinder(3.302, 138, mode=Mode.PRIVATE)
    add(fillet2_piece_6)

    # Fillet3
    fillet3_edges = [part.edges().sort_by_distance(p)[0] for p in [
        (0, -15.24, -6.4135),
    ]]
    fillet(fillet3_edges, radius=FILLET3_R)

    # Fillet4
    fillet4_edges = [part.edges().sort_by_distance(p)[0] for p in [
        (0, 10.16, -6.4135),
    ]]
    fillet(fillet4_edges, radius=FILLET4_R)


solid = part.part
